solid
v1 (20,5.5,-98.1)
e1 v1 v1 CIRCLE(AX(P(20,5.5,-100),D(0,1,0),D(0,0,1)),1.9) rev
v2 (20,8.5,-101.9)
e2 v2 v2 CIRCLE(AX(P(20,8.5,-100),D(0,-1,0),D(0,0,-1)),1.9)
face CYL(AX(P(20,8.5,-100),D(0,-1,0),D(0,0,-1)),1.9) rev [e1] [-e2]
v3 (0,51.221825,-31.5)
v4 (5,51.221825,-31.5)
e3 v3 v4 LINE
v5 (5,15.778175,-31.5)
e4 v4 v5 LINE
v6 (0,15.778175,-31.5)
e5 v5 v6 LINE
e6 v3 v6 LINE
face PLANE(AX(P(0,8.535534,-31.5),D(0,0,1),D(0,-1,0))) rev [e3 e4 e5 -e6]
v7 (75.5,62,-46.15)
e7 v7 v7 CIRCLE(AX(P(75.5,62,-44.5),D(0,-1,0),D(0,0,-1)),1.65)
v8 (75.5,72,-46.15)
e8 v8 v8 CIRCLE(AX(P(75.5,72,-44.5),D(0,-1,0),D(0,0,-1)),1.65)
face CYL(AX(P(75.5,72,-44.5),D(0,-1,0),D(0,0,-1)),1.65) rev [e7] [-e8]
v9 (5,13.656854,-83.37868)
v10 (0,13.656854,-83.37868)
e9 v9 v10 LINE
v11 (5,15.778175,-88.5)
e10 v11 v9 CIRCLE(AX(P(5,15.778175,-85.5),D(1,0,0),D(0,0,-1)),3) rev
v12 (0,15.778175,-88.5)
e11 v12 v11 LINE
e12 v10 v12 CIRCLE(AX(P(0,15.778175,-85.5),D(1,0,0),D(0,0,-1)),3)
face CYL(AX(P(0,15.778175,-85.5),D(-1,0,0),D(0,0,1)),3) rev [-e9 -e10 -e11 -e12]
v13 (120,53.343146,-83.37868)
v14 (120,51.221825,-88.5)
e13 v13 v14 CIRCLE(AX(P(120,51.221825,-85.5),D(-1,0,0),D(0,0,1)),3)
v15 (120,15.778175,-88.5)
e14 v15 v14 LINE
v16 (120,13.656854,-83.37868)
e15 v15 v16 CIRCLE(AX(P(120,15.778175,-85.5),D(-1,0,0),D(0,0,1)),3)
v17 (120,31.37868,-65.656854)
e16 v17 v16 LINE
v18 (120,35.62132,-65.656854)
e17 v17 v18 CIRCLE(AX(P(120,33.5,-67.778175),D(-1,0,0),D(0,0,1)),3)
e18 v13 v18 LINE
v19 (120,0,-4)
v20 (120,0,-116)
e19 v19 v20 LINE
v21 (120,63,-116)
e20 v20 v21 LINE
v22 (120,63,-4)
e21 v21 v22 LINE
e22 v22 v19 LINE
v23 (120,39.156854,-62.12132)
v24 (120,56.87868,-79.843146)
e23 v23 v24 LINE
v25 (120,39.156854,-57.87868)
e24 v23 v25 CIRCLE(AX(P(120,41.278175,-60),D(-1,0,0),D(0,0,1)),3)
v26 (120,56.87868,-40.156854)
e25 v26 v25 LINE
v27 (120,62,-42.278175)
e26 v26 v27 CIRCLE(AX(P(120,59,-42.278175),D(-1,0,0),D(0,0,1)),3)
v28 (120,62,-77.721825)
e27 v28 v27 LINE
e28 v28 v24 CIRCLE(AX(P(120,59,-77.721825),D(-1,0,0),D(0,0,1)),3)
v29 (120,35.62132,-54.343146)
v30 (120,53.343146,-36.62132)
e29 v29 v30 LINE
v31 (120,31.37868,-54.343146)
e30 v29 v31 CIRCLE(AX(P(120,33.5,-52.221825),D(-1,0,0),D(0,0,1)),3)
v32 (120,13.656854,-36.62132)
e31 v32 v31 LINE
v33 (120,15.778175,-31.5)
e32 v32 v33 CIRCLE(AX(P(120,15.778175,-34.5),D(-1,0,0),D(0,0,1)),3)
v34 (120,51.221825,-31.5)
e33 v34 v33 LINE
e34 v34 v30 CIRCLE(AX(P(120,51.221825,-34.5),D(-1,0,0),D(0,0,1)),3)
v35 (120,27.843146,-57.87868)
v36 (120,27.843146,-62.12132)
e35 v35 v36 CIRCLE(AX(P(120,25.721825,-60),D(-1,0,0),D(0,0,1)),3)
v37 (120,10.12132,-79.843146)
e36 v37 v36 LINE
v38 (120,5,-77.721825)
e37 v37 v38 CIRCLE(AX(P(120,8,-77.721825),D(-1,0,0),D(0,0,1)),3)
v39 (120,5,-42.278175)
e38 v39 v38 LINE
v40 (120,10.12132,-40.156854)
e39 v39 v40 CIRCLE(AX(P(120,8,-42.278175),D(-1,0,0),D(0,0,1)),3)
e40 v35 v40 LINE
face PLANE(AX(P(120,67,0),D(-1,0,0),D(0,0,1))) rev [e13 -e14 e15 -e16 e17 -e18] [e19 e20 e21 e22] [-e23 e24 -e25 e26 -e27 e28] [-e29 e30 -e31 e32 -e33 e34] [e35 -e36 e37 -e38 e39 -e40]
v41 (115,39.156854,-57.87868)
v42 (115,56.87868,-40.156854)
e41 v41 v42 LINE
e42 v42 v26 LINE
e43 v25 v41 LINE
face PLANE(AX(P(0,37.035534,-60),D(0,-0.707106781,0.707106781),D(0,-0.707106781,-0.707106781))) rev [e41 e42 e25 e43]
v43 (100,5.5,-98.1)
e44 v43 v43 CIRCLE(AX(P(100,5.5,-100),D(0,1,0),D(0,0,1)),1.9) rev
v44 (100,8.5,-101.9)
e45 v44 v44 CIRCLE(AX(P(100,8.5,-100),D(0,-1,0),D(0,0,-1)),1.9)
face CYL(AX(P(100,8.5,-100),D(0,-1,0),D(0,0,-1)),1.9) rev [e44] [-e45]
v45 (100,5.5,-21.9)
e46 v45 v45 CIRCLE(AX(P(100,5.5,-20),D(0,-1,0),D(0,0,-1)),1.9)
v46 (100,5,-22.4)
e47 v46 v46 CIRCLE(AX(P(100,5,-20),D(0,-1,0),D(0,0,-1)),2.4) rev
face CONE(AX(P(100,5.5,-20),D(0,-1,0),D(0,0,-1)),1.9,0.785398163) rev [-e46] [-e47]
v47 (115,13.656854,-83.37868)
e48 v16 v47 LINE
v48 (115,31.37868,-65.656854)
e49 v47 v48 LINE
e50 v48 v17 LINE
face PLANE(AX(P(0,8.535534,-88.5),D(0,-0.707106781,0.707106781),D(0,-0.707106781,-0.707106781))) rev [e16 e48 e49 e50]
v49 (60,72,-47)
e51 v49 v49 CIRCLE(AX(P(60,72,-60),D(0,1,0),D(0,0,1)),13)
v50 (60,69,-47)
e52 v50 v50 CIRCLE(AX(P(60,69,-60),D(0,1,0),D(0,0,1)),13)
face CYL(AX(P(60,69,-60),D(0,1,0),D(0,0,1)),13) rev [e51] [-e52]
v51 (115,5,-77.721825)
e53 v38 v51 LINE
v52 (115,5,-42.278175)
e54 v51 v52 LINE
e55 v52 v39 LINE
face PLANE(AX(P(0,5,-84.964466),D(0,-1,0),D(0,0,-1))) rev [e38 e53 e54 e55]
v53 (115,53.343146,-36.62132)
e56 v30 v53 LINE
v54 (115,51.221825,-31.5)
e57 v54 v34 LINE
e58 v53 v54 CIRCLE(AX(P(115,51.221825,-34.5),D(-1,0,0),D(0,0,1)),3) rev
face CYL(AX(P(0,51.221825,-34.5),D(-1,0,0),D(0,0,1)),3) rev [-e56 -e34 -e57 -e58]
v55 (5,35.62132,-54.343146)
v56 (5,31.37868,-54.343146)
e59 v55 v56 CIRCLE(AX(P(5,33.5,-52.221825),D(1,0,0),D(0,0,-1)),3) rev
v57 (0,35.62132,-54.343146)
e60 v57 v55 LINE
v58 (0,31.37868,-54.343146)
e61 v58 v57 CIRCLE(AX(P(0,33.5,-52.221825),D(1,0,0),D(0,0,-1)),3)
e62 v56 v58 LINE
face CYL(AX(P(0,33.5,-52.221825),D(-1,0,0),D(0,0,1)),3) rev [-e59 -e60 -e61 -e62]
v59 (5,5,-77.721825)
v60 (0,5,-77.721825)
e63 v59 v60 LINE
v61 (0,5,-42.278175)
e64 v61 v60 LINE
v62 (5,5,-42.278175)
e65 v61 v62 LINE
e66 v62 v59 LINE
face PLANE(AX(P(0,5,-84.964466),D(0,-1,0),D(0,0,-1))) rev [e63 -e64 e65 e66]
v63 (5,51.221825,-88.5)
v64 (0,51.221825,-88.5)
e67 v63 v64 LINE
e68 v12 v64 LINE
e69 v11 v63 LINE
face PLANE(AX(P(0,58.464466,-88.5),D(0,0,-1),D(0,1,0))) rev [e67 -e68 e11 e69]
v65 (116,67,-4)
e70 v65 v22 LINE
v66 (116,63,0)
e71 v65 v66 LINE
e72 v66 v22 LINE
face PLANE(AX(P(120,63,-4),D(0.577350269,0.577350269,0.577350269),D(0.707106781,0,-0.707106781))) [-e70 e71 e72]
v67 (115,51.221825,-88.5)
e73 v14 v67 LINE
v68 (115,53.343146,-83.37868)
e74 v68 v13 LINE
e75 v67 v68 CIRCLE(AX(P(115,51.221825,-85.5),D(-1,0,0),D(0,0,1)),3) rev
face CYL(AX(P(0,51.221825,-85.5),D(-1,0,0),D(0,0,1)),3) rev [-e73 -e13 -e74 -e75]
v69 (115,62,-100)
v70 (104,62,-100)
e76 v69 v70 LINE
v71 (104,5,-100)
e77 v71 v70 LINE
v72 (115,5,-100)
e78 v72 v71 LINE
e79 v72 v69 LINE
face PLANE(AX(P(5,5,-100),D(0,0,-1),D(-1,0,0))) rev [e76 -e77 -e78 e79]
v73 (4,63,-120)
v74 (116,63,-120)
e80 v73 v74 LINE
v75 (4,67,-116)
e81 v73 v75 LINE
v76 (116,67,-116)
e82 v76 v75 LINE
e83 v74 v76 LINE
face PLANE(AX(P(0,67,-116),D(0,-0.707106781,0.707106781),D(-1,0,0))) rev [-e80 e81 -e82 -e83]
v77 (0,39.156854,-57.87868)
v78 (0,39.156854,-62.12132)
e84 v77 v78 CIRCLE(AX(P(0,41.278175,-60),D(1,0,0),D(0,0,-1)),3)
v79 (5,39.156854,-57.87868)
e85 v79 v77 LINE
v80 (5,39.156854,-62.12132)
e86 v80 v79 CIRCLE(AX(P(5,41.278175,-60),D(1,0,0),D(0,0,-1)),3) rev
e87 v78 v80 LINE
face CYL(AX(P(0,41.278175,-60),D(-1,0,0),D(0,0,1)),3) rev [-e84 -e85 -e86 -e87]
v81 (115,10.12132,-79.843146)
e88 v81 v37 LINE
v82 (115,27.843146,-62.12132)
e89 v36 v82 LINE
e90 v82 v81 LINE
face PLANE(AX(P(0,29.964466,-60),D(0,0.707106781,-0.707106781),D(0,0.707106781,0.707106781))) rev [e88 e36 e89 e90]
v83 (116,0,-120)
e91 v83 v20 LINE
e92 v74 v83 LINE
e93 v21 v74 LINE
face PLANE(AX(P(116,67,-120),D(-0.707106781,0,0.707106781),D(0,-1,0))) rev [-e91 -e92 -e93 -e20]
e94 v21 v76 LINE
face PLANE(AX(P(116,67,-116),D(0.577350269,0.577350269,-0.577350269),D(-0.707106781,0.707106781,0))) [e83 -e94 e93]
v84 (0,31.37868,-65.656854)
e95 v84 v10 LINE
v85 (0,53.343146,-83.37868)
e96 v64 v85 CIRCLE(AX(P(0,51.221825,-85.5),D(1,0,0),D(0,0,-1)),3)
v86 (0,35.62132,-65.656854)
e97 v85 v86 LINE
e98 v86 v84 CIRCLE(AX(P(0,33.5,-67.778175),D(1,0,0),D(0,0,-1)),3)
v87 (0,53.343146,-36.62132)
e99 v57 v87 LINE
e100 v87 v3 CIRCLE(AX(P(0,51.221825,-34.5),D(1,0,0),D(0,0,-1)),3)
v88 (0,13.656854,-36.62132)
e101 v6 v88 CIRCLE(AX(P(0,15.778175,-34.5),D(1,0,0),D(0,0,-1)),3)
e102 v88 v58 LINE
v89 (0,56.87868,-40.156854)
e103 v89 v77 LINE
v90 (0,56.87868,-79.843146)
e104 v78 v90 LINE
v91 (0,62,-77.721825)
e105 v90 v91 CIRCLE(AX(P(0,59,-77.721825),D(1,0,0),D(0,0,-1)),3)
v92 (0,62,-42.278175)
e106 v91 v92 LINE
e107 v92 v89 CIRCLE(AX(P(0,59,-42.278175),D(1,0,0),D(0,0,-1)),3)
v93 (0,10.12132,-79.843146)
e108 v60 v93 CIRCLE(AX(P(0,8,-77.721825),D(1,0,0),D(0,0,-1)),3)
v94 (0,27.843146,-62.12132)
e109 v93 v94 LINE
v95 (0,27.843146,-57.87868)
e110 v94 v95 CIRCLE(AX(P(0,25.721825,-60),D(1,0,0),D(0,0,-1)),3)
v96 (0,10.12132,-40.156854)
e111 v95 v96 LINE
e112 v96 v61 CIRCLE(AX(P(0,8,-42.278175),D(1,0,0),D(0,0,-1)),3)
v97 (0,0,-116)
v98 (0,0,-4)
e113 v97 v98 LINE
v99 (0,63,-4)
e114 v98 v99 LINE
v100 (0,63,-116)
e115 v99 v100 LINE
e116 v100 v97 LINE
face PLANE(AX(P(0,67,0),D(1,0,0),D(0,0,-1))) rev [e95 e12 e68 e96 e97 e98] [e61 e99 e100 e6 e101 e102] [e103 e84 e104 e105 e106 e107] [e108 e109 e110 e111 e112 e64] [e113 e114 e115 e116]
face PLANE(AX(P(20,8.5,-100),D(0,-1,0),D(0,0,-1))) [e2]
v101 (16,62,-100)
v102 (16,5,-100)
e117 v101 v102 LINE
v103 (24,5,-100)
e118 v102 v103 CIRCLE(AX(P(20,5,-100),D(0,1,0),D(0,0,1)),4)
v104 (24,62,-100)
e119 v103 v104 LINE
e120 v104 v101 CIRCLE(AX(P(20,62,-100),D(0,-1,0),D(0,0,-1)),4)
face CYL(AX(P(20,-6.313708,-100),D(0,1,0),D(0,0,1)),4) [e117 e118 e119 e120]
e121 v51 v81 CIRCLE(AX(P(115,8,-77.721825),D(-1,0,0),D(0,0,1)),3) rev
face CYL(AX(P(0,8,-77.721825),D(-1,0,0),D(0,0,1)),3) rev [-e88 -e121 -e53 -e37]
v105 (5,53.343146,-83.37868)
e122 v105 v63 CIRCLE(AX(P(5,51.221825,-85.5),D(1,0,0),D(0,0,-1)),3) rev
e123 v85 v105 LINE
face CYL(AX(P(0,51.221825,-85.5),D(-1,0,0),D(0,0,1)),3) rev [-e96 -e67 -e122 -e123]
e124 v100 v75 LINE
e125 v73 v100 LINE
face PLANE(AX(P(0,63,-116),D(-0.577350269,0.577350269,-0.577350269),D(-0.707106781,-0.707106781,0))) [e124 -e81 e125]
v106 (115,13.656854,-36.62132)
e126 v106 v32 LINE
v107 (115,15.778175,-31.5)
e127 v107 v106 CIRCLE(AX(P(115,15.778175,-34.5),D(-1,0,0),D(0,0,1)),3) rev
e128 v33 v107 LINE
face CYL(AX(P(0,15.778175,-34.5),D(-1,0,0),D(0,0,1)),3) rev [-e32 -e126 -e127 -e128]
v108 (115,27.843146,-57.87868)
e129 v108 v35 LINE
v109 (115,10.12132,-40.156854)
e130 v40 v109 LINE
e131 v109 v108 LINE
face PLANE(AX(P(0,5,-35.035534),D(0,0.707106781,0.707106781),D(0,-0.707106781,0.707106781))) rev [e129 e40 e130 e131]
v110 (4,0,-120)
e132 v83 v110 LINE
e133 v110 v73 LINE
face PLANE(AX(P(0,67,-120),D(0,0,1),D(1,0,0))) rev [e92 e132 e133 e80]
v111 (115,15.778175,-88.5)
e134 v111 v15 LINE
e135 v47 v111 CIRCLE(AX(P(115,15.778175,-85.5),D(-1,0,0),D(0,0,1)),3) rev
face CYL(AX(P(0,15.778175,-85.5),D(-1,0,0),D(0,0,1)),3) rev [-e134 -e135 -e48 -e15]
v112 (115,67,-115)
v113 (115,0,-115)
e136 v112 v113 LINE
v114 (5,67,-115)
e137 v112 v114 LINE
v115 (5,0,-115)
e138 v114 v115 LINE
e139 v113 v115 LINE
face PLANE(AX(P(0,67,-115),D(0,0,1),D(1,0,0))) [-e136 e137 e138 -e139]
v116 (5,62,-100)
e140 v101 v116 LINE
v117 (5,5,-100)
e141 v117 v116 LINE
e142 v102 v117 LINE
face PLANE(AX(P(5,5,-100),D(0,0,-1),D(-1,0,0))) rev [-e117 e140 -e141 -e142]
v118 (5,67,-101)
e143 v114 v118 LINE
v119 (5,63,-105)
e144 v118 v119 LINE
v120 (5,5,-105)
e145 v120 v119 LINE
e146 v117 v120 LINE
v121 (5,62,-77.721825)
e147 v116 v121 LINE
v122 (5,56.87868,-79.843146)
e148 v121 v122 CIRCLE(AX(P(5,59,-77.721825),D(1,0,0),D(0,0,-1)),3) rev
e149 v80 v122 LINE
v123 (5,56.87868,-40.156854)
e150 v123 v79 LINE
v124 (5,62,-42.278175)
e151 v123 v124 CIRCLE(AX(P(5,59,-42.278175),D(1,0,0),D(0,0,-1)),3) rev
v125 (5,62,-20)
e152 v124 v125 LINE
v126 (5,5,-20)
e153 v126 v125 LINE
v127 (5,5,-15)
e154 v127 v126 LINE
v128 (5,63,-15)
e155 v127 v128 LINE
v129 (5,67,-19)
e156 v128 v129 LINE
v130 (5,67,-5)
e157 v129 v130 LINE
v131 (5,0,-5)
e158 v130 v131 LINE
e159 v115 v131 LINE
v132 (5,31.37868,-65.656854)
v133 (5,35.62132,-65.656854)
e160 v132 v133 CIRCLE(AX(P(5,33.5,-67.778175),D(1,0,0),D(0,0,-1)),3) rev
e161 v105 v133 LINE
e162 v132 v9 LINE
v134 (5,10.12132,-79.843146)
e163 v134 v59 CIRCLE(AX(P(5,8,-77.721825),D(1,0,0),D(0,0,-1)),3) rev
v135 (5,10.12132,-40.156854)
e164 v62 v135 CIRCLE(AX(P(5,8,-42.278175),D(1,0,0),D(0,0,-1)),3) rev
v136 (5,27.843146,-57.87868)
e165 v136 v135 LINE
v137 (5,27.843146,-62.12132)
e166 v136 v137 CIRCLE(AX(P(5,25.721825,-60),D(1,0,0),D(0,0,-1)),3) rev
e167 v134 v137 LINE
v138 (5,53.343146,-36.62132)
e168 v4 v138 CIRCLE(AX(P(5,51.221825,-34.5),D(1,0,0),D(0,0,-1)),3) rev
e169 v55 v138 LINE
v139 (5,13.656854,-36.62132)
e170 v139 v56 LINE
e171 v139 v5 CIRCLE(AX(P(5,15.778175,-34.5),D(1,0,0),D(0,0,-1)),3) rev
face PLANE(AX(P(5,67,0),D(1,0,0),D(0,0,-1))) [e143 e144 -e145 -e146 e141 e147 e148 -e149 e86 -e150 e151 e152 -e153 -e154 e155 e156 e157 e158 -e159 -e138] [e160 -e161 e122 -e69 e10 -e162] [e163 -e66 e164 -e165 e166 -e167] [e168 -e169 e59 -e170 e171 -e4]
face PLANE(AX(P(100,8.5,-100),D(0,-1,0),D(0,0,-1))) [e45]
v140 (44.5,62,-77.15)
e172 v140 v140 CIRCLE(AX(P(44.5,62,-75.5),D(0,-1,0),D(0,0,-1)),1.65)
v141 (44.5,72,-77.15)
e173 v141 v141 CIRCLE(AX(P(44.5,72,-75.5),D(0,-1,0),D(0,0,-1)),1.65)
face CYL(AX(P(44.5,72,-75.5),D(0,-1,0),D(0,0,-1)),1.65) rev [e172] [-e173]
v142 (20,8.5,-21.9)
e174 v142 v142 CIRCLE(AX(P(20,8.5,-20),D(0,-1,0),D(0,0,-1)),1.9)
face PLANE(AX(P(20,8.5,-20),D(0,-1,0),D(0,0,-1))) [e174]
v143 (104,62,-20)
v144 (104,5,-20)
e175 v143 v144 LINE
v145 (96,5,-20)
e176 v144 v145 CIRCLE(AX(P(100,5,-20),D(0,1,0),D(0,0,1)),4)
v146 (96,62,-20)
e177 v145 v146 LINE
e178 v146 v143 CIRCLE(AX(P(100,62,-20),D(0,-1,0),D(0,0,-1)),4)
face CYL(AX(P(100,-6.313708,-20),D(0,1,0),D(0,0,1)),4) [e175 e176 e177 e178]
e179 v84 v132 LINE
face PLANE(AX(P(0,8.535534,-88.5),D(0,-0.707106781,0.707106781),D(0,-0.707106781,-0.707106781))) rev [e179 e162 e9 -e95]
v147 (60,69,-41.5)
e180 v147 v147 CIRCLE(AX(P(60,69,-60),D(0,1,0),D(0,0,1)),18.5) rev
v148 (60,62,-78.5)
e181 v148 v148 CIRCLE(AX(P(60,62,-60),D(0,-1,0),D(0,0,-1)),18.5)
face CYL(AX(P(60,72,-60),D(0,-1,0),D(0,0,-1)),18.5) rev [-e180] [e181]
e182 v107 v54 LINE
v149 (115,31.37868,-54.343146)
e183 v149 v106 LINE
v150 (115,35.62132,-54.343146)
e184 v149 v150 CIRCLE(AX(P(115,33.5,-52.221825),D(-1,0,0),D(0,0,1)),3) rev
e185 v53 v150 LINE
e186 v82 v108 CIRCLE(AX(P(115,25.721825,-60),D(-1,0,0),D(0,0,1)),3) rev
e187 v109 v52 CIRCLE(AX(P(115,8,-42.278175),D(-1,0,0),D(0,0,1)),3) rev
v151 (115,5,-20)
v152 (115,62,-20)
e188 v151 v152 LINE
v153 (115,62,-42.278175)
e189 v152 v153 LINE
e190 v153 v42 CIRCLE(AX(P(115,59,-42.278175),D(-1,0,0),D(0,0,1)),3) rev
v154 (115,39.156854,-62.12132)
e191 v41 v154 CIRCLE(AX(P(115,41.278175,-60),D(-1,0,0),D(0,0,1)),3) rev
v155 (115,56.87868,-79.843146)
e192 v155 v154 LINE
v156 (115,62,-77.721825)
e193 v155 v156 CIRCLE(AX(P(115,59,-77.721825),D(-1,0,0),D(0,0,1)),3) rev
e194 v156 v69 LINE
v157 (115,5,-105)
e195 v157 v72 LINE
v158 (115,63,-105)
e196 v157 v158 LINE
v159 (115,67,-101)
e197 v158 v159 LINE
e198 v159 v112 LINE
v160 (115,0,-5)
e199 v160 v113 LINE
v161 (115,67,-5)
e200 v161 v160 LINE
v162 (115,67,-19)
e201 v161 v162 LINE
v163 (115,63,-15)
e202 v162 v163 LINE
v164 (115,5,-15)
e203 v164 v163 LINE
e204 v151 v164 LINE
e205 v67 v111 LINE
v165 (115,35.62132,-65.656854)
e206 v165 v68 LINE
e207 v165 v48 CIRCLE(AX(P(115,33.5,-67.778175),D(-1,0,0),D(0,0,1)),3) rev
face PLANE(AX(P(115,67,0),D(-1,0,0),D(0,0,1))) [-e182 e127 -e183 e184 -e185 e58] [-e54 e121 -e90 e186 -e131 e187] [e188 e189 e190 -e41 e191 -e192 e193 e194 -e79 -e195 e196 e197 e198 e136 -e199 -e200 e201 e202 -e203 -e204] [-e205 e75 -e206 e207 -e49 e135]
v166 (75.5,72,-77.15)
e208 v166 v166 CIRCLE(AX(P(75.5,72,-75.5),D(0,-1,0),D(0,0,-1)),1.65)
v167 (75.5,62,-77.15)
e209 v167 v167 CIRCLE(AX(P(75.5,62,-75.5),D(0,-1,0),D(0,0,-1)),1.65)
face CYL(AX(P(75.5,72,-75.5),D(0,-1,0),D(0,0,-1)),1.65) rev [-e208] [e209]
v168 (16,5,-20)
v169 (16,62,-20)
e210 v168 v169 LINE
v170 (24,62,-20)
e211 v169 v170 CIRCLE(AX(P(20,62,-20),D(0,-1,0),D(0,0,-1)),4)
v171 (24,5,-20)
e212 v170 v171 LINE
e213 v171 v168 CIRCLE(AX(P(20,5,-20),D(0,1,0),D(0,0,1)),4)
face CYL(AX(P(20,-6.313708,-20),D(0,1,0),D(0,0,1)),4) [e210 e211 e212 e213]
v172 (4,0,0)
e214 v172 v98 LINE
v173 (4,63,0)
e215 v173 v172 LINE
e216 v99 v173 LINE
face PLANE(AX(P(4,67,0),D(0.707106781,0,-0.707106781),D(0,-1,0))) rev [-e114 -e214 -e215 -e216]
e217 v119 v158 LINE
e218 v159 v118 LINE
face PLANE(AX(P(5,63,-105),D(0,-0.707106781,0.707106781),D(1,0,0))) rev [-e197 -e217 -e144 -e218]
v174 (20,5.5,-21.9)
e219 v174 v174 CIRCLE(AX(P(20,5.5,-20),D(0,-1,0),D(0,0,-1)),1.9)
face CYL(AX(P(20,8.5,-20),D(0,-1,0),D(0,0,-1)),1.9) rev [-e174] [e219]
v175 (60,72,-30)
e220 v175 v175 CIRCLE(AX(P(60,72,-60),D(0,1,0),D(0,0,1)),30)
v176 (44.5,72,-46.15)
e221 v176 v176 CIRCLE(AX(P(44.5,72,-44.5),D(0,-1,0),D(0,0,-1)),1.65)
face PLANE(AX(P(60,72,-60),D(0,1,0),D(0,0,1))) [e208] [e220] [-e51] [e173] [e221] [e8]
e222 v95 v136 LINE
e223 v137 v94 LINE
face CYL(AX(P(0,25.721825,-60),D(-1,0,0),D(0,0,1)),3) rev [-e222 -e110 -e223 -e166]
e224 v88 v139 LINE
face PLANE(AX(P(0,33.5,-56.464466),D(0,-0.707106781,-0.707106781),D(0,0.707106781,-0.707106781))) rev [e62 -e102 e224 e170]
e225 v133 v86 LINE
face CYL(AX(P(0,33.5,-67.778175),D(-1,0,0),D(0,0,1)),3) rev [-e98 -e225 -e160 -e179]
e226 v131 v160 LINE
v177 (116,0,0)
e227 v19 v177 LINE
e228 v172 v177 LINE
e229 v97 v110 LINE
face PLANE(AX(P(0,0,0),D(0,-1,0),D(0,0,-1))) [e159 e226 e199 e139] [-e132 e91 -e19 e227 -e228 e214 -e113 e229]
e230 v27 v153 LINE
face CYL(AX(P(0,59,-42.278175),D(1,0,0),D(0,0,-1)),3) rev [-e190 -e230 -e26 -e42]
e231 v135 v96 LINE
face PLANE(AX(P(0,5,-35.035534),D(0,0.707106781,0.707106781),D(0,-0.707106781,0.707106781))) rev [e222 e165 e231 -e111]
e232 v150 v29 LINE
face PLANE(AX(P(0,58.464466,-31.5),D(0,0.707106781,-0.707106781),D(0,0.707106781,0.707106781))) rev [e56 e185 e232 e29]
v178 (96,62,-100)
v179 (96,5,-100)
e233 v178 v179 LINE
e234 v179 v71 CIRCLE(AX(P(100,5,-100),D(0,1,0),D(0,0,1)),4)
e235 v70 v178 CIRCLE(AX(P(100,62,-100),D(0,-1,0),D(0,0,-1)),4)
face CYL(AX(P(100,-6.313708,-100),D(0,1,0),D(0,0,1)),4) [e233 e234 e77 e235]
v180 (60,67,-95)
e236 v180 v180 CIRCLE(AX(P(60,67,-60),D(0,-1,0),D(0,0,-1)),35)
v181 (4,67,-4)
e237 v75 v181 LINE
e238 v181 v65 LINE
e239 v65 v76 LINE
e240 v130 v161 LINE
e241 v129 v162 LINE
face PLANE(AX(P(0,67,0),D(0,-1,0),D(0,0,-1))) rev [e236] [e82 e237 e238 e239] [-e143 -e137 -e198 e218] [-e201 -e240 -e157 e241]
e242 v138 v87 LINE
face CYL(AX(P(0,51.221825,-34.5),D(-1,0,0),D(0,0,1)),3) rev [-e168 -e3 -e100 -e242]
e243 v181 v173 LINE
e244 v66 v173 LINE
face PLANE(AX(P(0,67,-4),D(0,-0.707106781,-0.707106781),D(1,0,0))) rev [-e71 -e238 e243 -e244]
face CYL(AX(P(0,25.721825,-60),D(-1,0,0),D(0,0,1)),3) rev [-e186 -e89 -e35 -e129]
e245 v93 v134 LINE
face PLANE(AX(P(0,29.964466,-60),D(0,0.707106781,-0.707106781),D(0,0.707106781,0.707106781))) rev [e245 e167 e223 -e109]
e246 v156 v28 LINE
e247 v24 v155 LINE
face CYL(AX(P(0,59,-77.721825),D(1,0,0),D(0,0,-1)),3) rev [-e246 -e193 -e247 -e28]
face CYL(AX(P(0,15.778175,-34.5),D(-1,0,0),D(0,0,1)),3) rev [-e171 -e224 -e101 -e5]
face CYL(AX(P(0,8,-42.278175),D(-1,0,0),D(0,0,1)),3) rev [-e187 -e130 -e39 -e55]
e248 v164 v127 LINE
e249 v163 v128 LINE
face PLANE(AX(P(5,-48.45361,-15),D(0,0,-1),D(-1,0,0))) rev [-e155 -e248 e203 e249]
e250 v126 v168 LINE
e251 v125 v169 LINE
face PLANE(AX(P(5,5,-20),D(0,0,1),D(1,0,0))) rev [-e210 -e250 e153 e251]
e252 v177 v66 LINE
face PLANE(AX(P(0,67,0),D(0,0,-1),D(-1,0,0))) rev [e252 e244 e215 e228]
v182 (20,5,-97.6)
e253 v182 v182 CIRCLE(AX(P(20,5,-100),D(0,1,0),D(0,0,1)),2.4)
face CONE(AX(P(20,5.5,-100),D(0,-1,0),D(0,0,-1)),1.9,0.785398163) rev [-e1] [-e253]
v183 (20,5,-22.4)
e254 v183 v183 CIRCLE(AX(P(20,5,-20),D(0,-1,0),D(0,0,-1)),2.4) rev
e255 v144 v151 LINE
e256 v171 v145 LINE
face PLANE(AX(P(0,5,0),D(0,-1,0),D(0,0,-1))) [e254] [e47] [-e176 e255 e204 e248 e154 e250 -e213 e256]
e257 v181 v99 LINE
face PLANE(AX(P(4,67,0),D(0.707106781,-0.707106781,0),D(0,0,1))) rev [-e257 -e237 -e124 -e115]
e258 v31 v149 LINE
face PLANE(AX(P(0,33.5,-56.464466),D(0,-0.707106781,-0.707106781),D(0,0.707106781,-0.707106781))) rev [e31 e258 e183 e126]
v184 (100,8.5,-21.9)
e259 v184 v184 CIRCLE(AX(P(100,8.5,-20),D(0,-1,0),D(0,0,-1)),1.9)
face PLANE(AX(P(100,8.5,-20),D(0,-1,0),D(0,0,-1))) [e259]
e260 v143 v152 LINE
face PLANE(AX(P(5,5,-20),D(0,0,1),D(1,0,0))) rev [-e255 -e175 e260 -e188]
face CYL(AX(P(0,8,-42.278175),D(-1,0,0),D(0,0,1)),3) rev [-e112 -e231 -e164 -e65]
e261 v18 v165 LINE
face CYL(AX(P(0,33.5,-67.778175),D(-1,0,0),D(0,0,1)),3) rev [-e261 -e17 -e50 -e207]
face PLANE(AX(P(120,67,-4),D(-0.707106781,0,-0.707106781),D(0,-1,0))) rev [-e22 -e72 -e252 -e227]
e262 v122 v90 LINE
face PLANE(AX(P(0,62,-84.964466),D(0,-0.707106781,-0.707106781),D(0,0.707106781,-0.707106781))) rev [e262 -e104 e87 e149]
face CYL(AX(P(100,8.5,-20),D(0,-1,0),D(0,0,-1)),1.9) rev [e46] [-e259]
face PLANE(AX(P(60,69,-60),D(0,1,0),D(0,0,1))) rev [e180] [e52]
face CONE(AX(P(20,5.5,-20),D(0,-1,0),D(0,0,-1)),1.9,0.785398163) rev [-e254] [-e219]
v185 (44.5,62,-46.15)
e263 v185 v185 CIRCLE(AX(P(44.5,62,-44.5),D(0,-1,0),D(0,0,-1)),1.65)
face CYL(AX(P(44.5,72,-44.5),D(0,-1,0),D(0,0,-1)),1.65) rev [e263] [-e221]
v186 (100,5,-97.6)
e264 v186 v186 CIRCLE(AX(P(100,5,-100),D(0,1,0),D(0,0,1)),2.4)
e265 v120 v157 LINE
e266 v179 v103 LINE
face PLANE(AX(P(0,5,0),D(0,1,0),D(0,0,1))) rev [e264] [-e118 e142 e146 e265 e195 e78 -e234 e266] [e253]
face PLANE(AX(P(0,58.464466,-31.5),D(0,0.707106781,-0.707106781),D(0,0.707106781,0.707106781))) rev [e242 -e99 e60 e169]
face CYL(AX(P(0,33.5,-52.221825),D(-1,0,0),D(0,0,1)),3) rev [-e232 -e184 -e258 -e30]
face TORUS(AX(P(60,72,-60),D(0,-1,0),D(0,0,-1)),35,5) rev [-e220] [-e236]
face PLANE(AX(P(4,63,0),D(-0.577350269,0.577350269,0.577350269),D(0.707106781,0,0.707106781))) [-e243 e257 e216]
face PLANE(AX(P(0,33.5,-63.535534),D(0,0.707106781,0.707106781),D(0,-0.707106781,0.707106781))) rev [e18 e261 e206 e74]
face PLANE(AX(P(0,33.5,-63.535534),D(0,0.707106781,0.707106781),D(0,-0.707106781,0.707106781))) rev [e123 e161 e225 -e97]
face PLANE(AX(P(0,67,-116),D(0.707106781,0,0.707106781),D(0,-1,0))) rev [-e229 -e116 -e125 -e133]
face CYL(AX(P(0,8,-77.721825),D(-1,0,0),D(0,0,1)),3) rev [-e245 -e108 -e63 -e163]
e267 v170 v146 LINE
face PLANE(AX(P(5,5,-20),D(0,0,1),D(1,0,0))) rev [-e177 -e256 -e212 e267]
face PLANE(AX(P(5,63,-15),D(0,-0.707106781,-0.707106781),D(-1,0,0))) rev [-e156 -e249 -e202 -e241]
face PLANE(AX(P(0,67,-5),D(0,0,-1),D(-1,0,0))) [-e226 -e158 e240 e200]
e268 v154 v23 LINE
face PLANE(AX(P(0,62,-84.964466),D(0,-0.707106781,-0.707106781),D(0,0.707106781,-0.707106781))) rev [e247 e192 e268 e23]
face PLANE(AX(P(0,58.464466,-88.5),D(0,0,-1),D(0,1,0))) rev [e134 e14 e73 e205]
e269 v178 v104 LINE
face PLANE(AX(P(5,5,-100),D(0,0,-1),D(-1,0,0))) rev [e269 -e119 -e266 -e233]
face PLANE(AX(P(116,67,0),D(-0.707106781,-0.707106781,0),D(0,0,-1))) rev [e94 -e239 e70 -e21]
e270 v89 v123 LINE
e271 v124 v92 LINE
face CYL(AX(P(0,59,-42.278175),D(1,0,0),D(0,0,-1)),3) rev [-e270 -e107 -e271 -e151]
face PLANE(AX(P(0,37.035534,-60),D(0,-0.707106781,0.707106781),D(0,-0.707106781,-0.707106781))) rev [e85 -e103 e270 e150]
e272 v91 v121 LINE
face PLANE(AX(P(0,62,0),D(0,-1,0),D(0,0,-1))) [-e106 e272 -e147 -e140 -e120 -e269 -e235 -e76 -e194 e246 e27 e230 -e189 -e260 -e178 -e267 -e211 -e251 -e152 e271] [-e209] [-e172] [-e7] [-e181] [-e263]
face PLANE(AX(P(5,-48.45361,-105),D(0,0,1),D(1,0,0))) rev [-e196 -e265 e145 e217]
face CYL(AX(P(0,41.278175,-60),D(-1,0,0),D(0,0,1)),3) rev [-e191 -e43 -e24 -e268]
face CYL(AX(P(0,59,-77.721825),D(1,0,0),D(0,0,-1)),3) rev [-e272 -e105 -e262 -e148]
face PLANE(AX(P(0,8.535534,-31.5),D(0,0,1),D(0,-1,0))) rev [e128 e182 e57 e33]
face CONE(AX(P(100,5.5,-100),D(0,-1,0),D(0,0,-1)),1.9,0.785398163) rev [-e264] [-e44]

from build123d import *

# Parameters (mm, degrees)
SKETCH_1_W          = 120
SKETCH_1_H          = 120
EXTRUDE_1_DEPTH     = 67
SHELL_1_T           = -5
SKETCH_3_R          = 30
EXTRUDE_2_DEPTH     = 5
SKETCH_2_R          = 1.65
SKETCH_2_R_2        = 18.5
CUT_EXTRUDE_1_DEPTH = 181.676506497
EXTRUDE_START       = -3
SKETCH_4_R          = 18.5
SKETCH_4_R_2        = 13
EXTRUDE_3_DEPTH     = 3
FILLET_2_R          = 5
SKETCH_6_W          = 110
SKETCH_6_H          = 10
CUT_EXTRUDE_2_DEPTH = 5
SKETCH_8_W          = 110
SKETCH_8_H          = 5
EXTRUDE_4_DEPTH     = 57
SKETCH_9_R          = 4
EXTRUDE_5_DEPTH     = 57
SKETCH_10_R         = 1.9
CUT_EXTRUDE_3_DEPTH = 3.5
CUT_EXTRUDE_4_DEPTH = 185.347497949
FILLET_3_R          = 3
CHAMFER_1_SIZE      = 4
CHAMFER_2_SIZE      = 0.5


with BuildPart() as part:
    # 草图1 → 凸台-拉伸1 (new body)
    with BuildSketch(Plane(origin=(0, 0, 0), x_dir=(1, 0, 0), z_dir=(0, 1, 0))):
        with Locations((60, 60)):
            Rectangle(SKETCH_1_W, SKETCH_1_H)
    extrude(amount=EXTRUDE_1_DEPTH)

    # 抽壳1
    shell_1_openings = [part.faces().sort_by_distance(p)[0] for p in [
        (60, 0, -60),
    ]]
    offset(amount=SHELL_1_T, openings=shell_1_openings, kind=Kind.INTERSECTION)

    # 草图3 → 凸台-拉伸2 (add)
    with BuildSketch(Plane(origin=(0, 67, 0), x_dir=(1, 0, 0), z_dir=(0, 1, 0))):
        with Locations(Location((60, 60, 0), (0, 0, 270))):
            Circle(SKETCH_3_R)
    extrude(amount=EXTRUDE_2_DEPTH)

    # 草图2 → 切除-拉伸1 (cut, through all)
    with BuildSketch(Plane.XZ.offset(-62)):
        with Locations(Location((44.5, -44.5, 0), (0, 0, 270))):
            Circle(SKETCH_2_R)
        with Locations(Location((44.5, -75.5, 0), (0, 0, 270))):
            Circle(SKETCH_2_R)
        with Locations(Location((75.5, -44.5, 0), (0, 0, 270))):
            Circle(SKETCH_2_R)
        with Locations(Location((75.5, -75.5, 0), (0, 0, 270))):
            Circle(SKETCH_2_R)
        with Locations(Location((60, -60, 0), (0, 0, 270))):
            Circle(SKETCH_2_R_2)
    extrude(amount=-CUT_EXTRUDE_1_DEPTH, mode=Mode.SUBTRACT)

    # 草图4 → 凸台-拉伸3 (add)
    with BuildSketch(Plane(origin=(0, 72, 0), x_dir=(1, 0, 0), z_dir=(0, 1, 0)).offset(EXTRUDE_START)):
        with Locations(Location((60, 60, 0), (0, 0, 90))):
            Circle(SKETCH_4_R)
        with Locations(Location((60, 60, 0), (0, 0, 270))):
            Circle(SKETCH_4_R_2, mode=Mode.SUBTRACT)
    extrude(amount=EXTRUDE_3_DEPTH)

    # 圆角2
    fillet_2_edges = [part.edges().sort_by_distance(p)[0] for p in [
        (60, 67, -90),
    ]]
    fillet(fillet_2_edges, radius=FILLET_2_R - 0.0001)  # a hair under: the kernel refuses the full size

    # 草图6 → 切除-拉伸2 (cut)
    with BuildSketch(Plane(origin=(0, 67, 0), x_dir=(1, 0, 0), z_dir=(0, 1, 0))):
        with Locations((60, 10)):
            Rectangle(SKETCH_6_W, SKETCH_6_H)
        with Locations((60, 110)):
            Rectangle(SKETCH_6_W, SKETCH_6_H)
    extrude(amount=-CUT_EXTRUDE_2_DEPTH, mode=Mode.SUBTRACT)

    # 草图8 → 凸台-拉伸4 (add)
    with BuildSketch(Plane.XZ.offset(-62)):
        with Locations((60, -17.5)):
            Rectangle(SKETCH_8_W, SKETCH_8_H)
        with Locations((60, -102.5)):
            Rectangle(SKETCH_8_W, SKETCH_8_H)
    extrude(amount=EXTRUDE_4_DEPTH)

    # 草图9 → 凸台-拉伸5 (add)
    with BuildSketch(Plane.XZ.offset(-62)):
        with Locations((20, -20)):
            Circle(SKETCH_9_R)
        with Locations((20, -100)):
            Circle(SKETCH_9_R)
        with Locations((100, -100)):
            Circle(SKETCH_9_R)
        with Locations((100, -20)):
            Circle(SKETCH_9_R)
    extrude(amount=EXTRUDE_5_DEPTH)

    # 草图10 → 切除-拉伸3 (cut)
    with BuildSketch(Plane.XZ.offset(-5)):
        with Locations(Location((20, -100, 0), (0, 0, 270))):
            Circle(SKETCH_10_R)
        with Locations(Location((100, -100, 0), (0, 0, 270))):
            Circle(SKETCH_10_R)
        with Locations(Location((100, -20, 0), (0, 0, 270))):
            Circle(SKETCH_10_R)
        with Locations(Location((20, -20, 0), (0, 0, 270))):
            Circle(SKETCH_10_R)
    extrude(amount=-CUT_EXTRUDE_3_DEPTH, mode=Mode.SUBTRACT)

    # 草图12 → 切除-拉伸4 (cut, through all)
    with BuildSketch(Plane(origin=(120, 0, 0), x_dir=(0, 0, -1), z_dir=(1, 0, 0))):
        Polygon((31.5, 58.464466094), (56.464466094, 33.5), (31.5, 8.535533906), align=None)
        Polygon((35.035533906, 62), (84.964466094, 62), (60, 37.035533906), align=None)
        Polygon((88.5, 58.464466094), (88.5, 8.535533906), (63.535533906, 33.5), align=None)
        Polygon((84.964466094, 5), (35.035533906, 5), (60, 29.964466094), align=None)
    extrude(amount=-CUT_EXTRUDE_4_DEPTH, mode=Mode.SUBTRACT)

    # 圆角3
    fillet_3_edges = [part.edges().sort_by_distance(p)[0] for p in [
        (2.5, 33.5, -63.535533906),
        (2.5, 58.464466094, -88.5),
        (2.5, 8.535533906, -88.5),
        (117.5, 33.5, -63.535533906),
        (117.5, 58.464466094, -88.5),
        (117.5, 8.535533906, -88.5),
        (2.5, 37.035533906, -60),
        (2.5, 62, -84.964466094),
        (2.5, 62, -35.035533906),
        (117.5, 62, -35.035533906),
        (117.5, 37.035533906, -60),
        (117.5, 62, -84.964466094),
        (2.5, 29.964466094, -60),
        (2.5, 5, -84.964466094),
        (2.5, 5, -35.035533906),
        (117.5, 29.964466094, -60),
        (117.5, 5, -84.964466094),
        (117.5, 5, -35.035533906),
        (2.5, 8.535533906, -31.5),
        (2.5, 58.464466094, -31.5),
        (2.5, 33.5, -56.464466094),
        (117.5, 8.535533906, -31.5),
        (117.5, 58.464466094, -31.5),
        (117.5, 33.5, -56.464466094),
    ]]
    fillet(fillet_3_edges, radius=FILLET_3_R)

    # 倒角1
    chamfer_1_edges = [part.edges().sort_by_distance(p)[0] for p in [
        (120, 67, -60),
        (60, 67, -120),
        (0, 67, -60),
        (60, 67, -15),
        (60, 67, -105),
        (0, 33.5, -120),
        (120, 33.5, -120),
        (120, 33.5, 0),
        (0, 33.5, 0),
        (60, 67, 0),
    ]]
    chamfer(chamfer_1_edges, length=CHAMFER_1_SIZE)

    # 倒角2
    chamfer_2_edges = [part.edges().sort_by_distance(p)[0] for p in [
        (20, 5, -18.1),
        (100, 5, -18.1),
        (100, 5, -98.1),
        (20, 5, -98.1),
    ]]
    chamfer(chamfer_2_edges, length=CHAMFER_2_SIZE)


solid = part.part
